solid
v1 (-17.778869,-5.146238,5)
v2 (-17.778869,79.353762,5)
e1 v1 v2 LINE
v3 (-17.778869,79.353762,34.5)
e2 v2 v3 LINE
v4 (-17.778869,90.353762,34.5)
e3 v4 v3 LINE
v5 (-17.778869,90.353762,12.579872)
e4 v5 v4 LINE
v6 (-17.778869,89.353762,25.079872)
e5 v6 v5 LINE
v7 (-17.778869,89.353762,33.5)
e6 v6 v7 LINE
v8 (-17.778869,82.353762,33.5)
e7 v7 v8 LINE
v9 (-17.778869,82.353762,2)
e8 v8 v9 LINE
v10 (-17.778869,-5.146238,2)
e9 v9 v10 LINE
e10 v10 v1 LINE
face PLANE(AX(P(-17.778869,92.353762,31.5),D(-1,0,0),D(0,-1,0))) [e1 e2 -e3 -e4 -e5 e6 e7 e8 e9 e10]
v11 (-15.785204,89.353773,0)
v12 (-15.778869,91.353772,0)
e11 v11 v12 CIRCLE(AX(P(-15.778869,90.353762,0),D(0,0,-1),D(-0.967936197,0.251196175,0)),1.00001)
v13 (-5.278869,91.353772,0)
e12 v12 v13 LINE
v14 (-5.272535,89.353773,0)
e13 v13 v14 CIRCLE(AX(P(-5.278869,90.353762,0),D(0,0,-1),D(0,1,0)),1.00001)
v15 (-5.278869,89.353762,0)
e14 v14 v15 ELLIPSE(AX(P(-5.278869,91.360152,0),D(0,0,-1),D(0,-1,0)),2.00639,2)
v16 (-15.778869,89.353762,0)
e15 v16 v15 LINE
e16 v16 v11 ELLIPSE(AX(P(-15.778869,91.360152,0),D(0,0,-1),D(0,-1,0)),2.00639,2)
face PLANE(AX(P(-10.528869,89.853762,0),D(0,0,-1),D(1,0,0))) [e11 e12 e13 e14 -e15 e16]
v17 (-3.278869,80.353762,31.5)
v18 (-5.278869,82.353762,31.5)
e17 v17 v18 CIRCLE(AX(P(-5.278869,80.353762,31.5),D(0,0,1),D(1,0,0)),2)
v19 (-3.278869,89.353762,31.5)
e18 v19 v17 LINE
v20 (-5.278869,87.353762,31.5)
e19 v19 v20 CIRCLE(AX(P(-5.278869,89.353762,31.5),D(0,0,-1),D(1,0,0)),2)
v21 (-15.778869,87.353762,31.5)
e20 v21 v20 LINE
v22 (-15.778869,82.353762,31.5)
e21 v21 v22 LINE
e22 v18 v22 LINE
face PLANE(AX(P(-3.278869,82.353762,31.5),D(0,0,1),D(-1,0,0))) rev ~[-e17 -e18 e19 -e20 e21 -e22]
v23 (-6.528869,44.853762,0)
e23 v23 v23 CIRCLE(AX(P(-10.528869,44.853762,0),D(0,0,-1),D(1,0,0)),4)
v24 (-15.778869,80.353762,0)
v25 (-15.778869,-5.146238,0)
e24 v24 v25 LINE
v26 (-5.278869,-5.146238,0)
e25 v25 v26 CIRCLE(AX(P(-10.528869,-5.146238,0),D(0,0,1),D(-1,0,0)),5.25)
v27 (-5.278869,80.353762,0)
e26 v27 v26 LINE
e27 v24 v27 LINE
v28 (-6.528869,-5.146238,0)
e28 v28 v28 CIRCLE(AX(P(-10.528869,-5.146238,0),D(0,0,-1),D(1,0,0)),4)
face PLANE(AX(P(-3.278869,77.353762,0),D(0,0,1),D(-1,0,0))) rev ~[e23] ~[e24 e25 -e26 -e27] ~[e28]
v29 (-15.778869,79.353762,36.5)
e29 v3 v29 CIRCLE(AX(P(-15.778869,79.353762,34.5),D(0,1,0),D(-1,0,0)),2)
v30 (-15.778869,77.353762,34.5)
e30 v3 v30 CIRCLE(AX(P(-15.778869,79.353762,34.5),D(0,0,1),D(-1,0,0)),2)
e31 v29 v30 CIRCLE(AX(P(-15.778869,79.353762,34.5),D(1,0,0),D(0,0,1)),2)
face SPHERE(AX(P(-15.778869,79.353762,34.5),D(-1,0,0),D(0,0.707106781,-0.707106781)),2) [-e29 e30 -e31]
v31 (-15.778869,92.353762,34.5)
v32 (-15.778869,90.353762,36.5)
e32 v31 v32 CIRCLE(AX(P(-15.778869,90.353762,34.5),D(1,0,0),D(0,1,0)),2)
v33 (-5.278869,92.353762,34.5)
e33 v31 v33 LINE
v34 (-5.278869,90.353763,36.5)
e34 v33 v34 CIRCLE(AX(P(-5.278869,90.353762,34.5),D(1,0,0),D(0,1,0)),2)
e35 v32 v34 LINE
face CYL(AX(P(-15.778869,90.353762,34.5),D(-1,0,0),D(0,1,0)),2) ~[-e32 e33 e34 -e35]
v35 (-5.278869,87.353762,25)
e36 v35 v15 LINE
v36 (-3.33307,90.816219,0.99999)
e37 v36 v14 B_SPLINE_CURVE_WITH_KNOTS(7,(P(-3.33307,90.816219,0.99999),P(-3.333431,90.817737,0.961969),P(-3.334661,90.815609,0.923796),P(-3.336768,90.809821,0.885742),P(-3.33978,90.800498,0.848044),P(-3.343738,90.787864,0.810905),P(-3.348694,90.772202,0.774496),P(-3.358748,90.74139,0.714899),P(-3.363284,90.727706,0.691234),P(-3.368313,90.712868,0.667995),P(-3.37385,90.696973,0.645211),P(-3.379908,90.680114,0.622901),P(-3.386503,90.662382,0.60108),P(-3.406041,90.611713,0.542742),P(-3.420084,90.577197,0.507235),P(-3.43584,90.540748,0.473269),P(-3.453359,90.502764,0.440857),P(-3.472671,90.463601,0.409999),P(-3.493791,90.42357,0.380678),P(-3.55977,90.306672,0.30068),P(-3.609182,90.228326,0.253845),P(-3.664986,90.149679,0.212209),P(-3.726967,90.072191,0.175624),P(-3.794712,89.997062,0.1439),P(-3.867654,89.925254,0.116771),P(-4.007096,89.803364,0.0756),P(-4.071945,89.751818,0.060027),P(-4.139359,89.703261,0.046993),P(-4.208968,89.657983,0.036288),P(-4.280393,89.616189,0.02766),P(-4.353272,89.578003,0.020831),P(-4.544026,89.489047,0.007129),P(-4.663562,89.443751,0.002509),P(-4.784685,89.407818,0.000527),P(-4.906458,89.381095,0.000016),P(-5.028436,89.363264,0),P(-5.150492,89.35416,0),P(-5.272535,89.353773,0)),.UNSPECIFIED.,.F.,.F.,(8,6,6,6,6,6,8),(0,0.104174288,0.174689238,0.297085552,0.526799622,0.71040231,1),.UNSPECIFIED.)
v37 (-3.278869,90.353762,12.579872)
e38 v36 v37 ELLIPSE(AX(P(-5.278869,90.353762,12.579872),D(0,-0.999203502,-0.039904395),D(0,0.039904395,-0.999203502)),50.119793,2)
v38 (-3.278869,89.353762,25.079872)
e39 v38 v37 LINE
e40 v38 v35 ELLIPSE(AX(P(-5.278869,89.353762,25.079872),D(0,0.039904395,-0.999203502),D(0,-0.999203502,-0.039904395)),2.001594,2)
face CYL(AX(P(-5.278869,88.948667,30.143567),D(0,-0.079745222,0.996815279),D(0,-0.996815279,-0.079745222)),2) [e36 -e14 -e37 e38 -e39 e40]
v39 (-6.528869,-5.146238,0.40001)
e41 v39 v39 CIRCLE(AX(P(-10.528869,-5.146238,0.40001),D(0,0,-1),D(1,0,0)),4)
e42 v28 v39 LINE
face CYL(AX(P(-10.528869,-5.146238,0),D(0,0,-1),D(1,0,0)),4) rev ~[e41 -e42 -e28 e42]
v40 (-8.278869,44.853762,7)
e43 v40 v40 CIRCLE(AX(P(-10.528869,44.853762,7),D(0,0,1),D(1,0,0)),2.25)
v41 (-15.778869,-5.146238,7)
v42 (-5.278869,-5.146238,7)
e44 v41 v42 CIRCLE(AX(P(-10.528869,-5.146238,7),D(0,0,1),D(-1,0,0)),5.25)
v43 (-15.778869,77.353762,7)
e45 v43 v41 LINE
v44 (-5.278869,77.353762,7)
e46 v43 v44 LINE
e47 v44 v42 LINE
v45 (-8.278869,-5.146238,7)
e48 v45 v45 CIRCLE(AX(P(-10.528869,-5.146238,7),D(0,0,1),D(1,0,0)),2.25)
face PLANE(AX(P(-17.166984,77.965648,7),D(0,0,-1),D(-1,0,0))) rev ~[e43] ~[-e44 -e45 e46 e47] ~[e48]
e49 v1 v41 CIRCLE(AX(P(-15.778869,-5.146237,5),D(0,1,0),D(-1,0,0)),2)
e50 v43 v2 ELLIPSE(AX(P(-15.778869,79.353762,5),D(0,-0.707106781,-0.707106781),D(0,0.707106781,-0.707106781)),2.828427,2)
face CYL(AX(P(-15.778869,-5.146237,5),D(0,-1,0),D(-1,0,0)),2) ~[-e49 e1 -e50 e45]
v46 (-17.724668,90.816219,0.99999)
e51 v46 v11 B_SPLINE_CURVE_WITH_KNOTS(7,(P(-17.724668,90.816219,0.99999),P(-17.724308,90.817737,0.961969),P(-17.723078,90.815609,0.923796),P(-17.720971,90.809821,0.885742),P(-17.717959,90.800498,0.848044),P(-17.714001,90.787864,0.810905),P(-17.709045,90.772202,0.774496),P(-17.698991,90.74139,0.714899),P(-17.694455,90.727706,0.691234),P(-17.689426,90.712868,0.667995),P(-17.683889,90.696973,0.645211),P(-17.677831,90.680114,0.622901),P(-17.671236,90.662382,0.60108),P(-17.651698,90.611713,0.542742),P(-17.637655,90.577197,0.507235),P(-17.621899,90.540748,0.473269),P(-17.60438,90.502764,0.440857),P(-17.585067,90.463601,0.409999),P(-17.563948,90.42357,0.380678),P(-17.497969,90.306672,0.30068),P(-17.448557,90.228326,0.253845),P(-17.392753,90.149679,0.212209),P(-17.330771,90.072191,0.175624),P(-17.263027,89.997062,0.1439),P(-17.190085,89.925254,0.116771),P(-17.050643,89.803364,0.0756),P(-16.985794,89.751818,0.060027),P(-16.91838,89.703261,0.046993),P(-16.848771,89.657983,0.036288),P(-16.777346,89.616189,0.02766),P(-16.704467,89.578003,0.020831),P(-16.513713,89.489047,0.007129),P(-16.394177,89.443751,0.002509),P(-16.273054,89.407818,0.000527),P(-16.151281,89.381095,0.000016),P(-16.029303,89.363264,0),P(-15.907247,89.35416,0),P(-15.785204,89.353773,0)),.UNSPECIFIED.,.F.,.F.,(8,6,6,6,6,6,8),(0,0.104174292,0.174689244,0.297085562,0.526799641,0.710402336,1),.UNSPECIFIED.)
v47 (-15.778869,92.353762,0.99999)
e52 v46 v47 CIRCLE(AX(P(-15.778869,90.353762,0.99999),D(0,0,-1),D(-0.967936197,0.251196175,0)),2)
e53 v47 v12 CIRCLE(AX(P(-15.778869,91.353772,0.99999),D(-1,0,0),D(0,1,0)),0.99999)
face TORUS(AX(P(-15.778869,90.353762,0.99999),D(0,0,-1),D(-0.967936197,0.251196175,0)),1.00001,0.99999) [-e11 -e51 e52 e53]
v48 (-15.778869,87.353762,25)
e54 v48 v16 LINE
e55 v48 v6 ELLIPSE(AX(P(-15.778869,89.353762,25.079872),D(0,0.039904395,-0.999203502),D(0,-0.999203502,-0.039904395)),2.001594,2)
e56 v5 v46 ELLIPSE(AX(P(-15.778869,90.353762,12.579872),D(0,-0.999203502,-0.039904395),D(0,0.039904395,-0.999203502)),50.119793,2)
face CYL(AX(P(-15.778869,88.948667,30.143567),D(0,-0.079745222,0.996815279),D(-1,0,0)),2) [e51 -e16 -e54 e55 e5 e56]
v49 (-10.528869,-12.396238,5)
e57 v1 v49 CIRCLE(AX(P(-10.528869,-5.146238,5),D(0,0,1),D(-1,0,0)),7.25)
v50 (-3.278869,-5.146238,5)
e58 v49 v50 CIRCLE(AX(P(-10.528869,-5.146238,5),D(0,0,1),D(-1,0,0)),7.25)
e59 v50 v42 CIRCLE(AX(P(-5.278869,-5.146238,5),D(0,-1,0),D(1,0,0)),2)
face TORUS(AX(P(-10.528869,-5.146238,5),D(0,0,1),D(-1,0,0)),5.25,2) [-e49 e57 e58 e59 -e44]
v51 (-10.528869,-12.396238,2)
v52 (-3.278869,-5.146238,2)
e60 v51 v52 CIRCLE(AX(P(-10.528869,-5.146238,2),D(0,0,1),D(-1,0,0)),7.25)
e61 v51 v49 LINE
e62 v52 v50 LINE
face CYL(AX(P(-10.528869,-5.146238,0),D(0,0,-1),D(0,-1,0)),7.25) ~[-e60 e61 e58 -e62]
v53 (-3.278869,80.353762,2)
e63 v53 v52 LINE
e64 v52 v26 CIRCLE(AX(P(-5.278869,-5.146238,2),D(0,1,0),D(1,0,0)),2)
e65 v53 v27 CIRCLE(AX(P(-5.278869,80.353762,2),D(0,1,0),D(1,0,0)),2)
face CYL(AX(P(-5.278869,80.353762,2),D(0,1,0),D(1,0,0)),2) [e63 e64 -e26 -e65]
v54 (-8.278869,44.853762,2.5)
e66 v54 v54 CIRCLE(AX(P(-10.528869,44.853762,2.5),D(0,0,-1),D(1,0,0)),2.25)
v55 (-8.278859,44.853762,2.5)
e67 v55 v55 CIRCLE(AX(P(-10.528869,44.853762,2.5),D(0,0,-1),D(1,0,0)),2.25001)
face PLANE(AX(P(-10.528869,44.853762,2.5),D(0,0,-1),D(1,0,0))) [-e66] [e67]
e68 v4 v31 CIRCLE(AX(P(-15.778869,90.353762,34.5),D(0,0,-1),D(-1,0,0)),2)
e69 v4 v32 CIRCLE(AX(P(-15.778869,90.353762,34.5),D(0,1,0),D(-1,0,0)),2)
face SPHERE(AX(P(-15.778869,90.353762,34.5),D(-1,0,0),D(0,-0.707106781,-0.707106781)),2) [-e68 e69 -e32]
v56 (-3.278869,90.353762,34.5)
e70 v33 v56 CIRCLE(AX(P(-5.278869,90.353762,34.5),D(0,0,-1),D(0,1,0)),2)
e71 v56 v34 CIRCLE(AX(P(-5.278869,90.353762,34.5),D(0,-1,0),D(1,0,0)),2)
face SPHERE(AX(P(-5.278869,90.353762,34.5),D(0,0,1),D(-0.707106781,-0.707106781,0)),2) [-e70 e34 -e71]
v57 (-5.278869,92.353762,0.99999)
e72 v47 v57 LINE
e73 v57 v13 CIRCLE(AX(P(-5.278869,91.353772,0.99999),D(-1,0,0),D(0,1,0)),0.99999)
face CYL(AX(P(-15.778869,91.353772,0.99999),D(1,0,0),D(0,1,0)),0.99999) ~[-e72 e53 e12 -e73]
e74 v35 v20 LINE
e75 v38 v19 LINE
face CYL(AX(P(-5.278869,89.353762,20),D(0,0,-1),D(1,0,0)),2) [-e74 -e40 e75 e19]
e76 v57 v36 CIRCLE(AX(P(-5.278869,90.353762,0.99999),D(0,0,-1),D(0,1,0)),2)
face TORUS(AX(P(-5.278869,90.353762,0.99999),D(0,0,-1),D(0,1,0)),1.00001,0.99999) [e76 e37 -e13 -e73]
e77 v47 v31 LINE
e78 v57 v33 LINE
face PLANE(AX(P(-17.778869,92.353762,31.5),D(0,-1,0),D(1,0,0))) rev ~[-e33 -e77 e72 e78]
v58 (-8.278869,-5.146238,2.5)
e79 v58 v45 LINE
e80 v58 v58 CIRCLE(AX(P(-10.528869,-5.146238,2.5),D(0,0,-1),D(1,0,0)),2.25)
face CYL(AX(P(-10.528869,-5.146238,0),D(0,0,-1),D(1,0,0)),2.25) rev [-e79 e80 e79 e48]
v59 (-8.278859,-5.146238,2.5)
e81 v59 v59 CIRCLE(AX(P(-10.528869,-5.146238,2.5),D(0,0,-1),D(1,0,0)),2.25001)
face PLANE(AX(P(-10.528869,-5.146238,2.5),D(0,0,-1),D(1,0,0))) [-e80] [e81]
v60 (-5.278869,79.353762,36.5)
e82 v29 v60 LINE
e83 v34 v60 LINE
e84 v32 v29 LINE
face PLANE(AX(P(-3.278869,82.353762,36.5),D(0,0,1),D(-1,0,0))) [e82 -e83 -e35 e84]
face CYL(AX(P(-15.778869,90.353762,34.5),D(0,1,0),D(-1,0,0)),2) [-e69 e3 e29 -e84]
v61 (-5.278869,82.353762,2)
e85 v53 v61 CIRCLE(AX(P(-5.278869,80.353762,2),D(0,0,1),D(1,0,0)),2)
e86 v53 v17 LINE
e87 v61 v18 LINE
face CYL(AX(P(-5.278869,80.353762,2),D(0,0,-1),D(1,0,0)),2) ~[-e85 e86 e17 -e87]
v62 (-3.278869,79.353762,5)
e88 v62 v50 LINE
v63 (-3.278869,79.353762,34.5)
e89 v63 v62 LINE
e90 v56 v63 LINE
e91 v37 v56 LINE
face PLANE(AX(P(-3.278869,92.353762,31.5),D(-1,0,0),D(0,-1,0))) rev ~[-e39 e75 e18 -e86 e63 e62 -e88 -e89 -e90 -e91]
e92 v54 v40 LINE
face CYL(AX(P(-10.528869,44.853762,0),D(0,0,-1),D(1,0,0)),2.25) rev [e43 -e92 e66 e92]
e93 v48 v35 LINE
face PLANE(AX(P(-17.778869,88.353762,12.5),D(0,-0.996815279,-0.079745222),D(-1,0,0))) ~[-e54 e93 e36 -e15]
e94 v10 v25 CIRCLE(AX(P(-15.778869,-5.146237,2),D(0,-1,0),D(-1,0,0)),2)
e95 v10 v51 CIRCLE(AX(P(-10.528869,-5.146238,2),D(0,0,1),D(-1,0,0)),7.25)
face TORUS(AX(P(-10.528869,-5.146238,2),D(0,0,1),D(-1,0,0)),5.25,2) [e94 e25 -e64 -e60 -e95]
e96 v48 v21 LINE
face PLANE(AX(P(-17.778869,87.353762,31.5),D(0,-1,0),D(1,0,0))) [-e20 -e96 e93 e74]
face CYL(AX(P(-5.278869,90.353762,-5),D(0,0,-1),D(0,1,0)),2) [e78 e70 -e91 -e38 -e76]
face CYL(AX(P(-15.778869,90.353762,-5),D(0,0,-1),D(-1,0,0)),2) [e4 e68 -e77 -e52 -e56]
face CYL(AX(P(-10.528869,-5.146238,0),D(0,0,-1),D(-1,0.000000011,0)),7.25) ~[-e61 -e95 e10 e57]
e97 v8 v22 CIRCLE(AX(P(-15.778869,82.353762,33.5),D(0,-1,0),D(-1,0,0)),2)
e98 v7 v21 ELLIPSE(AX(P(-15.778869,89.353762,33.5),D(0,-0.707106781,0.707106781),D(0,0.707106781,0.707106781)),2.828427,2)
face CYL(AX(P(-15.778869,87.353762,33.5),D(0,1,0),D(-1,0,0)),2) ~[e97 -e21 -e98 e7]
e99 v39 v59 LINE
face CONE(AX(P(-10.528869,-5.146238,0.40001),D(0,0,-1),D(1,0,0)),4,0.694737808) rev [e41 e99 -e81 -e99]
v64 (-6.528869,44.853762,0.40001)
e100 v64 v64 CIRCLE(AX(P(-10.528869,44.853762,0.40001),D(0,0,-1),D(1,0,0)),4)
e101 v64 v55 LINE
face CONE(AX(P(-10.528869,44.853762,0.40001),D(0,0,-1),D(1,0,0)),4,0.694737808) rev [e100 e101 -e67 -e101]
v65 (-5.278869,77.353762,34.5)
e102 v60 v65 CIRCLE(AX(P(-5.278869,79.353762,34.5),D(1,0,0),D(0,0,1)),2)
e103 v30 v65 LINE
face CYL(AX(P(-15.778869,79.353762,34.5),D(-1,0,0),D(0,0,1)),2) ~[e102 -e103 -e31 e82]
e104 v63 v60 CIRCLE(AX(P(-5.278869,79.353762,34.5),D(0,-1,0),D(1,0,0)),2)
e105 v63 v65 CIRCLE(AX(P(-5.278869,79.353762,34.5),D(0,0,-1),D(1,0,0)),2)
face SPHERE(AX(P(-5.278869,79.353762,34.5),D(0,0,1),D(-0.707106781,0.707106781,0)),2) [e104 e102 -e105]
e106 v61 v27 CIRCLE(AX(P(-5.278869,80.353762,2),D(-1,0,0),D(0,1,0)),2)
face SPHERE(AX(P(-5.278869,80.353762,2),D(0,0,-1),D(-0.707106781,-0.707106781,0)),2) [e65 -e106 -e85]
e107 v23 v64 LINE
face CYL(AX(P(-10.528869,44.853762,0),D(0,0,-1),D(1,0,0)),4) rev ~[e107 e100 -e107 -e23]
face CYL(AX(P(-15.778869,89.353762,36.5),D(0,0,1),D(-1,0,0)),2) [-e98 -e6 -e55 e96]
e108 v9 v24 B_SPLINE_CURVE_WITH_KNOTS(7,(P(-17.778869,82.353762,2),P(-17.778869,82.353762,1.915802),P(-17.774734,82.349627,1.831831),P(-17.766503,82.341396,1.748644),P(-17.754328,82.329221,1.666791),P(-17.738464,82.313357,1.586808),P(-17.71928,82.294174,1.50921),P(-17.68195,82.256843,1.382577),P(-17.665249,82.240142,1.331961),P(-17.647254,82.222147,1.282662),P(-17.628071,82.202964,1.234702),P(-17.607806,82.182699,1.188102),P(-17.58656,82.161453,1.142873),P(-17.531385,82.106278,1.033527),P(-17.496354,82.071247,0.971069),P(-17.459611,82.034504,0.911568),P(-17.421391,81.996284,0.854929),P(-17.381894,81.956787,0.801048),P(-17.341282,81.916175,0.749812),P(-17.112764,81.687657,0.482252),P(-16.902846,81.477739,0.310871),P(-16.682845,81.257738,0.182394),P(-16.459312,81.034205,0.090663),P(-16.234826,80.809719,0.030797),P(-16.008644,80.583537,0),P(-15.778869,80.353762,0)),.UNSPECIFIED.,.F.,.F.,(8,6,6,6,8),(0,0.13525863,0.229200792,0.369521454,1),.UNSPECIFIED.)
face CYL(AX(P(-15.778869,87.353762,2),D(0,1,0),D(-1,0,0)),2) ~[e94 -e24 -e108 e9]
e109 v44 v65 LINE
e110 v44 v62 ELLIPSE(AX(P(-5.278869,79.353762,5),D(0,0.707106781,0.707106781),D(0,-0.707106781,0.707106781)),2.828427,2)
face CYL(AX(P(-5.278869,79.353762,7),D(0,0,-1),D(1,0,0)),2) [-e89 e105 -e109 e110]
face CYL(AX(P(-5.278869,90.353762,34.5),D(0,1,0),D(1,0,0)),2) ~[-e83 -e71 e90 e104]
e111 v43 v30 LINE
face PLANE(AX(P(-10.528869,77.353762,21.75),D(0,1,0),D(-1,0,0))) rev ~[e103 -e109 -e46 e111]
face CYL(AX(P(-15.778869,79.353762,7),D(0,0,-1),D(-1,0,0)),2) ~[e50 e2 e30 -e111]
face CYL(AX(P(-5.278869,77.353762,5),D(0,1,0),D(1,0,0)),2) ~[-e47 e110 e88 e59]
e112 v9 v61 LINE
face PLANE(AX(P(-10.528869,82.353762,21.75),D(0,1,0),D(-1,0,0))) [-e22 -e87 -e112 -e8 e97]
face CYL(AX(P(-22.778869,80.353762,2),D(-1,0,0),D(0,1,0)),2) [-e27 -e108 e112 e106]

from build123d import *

# Parameters (mm, degrees)
F2_R          = 2.25
F7_DEPTH      = 7
F10_R         = 4
F10_R_2       = 2.25
F11_DEPTH     = 2.5
F12_SIZE2     = 1.74999
F12_SIZE      = 2.09999
F12_2_SIZE2   = 1.74999
F12_2_SIZE    = 2.09999
F14_W         = 14.5
F14_H         = 25.25
F15_DEPTH     = 7
F16_W         = 14.5
F16_H         = 29.5
F16_H_2       = 7
F17_DEPTH     = 5
F18_W         = 14.5
F18_H         = 5
F19_DEPTH     = 10
F20_W         = 14.5
F20_H         = 5
F21_DEPTH     = 31.5
F22_SIZE2     = 2
F22_SIZE      = 25
F23_T1_DEPTH  = 11
F23_T3_DEPTH  = 27.5
F23_T5_DEPTH  = 29.5
F23_T7_DEPTH  = 11.5
F23_T9_DEPTH  = 39.5
F23_T11_DEPTH = 35.079872408
F23_T13_DEPTH = 82.5
F23_T15_DEPTH = 85.5
F23_T17_DEPTH = 5
F23_T19_DEPTH = 10.5
F23_T21_DEPTH = 17.5
F23_T23_DEPTH = 92.4999999229
F23_T25_DEPTH = 82.4999999229
F23_S29_W     = 2
F23_S29_H     = 2
F23_T30_DEPTH = 2
F23_S35_W     = 2
F23_S35_H     = 2
F23_T36_DEPTH = 2
F23_S41_W     = 2
F23_S41_H     = 2
F23_T42_DEPTH = 2
F23_S47_W     = 2
F23_S47_H     = 2
F23_T48_DEPTH = 2
F23_S53_W     = 2
F23_S53_H     = 2
F23_T54_DEPTH = 2
F23_T58_ANGLE = 180.0000006096
F23_T60_ANGLE = 180.0000006096
F23_T65_DEPTH = 32.5
F23_T69_DEPTH = 87.5
F23_T76_DEPTH = 32.5
F23_T80_DEPTH = 87.4999999229
F23_T87_DEPTH = 16.5
F23_T91_DEPTH = 10
F24_R         = 0.99999


# Not quite as in the source:
# - a fillet or chamfer that OpenCascade refuses, or shapes differently, is made with other operations: its cross-section is extruded or revolved along the edge and cut away or added
# - a fillet or chamfer is up to 0.001 mm smaller than in the source, because OpenCascade refuses the exact size


with BuildPart() as f7:
    # F2 (on Top) → F7 (new body)
    with BuildSketch(Plane.XY):
        with BuildLine():
            Line((-3.2788694371, 52.1037624441), (-17.7788694371, 52.1037624441))
            Line((-17.7788694371, 52.1037624441), (-17.7788694371, -5.1462374788))
            ThreePointArc((-17.7788694371, -5.1462374788), (-10.5288693985, 2.1037624441), (-3.2788694371, -5.1462375559))
            Line((-3.2788694371, -5.1462375559), (-3.2788694371, 52.1037624441))
        make_face()
        with Locations((-10.5288694371, 44.8537624441)):
            Circle(F2_R, mode=Mode.SUBTRACT)
        with BuildLine():
            ThreePointArc((-3.2788694371, -5.1462375559), (-10.5288693985, 2.1037624441), (-17.7788694371, -5.1462374788))
            ThreePointArc((-17.7788694371, -5.1462374788), (-15.6553936279, -10.2727616922), (-10.5288694371, -12.3962375559))
            ThreePointArc((-10.5288694371, -12.3962375559), (-5.4023452735, -10.2727617195), (-3.2788694371, -5.1462375559))
        make_face()
        with Locations((-10.5288694371, -5.1462375559)):
            Circle(F2_R, mode=Mode.SUBTRACT)
    extrude(amount=F7_DEPTH)

    # F10 (on face) → F11 (cut)
    with BuildSketch(Plane(origin=(0, 0, 0), x_dir=(1, 0, 0), z_dir=(0, 0, -1))):
        with Locations((-10.5288694371, 5.1462375559)):
            Circle(F10_R)
        with Locations((-10.5288694371, 5.1462375559)):
            Circle(F10_R_2, mode=Mode.SUBTRACT)
        with Locations((-10.5288694371, -44.8537624441)):
            Circle(F10_R)
        with Locations((-10.5288694371, -44.8537624441)):
            Circle(F10_R_2, mode=Mode.SUBTRACT)
    extrude(amount=-F11_DEPTH, mode=Mode.SUBTRACT)

    # F12 (size 2.1 and 1.75 in the source; OpenCascade refuses exactly that, so slightly less here)
    f12_edges = [f7.edges().sort_by_distance(p)[0] for p in [
        (-14.528869, -5.146238, 2.5),
    ]]
    f12_side = f7.faces().sort_by_distance((-14.528869, -5.146238, 1.25))[0]
    chamfer(f12_edges, length=F12_SIZE, length2=F12_SIZE2, reference=f12_side)

    # F12#2 (size 2.1 and 1.75 in the source; OpenCascade refuses exactly that, so slightly less here)
    f12_2_edges = [f7.edges().sort_by_distance(p)[0] for p in [
        (-14.528869, 44.853762, 2.5),
    ]]
    f12_2_side = f7.faces().sort_by_distance((-14.528869, 44.853762, 1.25))[0]
    chamfer(f12_2_edges, length=F12_2_SIZE, length2=F12_2_SIZE2, reference=f12_2_side)

    # F14 (on face) → F15 (join)
    with BuildSketch(Plane.XY.offset(7)):
        with Locations((-10.5288694371, 64.7287624441)):
            Rectangle(F14_W, F14_H)
    extrude(amount=-F15_DEPTH)

    # F16 (on face) → F17 (join)
    with BuildSketch(Plane(origin=(0, 77.3537624441, 0), x_dir=(-1, 0, 0), z_dir=(0, 1, 0))):
        with Locations((10.5288694371, 21.75)):
            Rectangle(F16_W, F16_H)
        with Locations((10.5288694371, 3.5)):
            Rectangle(F16_W, F16_H_2)
    extrude(amount=F17_DEPTH)

    # F18 (on face) → F19 (join)
    with BuildSketch(Plane(origin=(0, 82.3537624441, 0), x_dir=(-1, 0, 0), z_dir=(0, 1, 0))):
        with Locations((10.5288694371, 34)):
            Rectangle(F18_W, F18_H)
    extrude(amount=F19_DEPTH)

    # F20 (on face) → F21 (join)
    with BuildSketch(Plane(origin=(0, 0, 31.5), x_dir=(1, 0, 0), z_dir=(0, 0, -1))):
        with Locations((-10.5288694371, -89.8537624441)):
            Rectangle(F20_W, F20_H)
    extrude(amount=F21_DEPTH)

    # F22
    f22_edges = [f7.edges().sort_by_distance(p)[0] for p in [
        (-10.528869, 87.353762, 0),
    ]]
    f22_side = f7.faces().sort_by_distance((-10.528869, 87.353762, 15.75))[0]
    chamfer(f22_edges, length=F22_SIZE, length2=F22_SIZE2, reference=f22_side)

    # F23: fillet of radius 2 on 17 edges, made by hand

    # F23_s2 → F23_t1 (cut)
    with BuildSketch(Plane.XZ.offset(-90.3537624441)):
        with BuildLine():
            ThreePointArc((-3.2788694371, 34.5), (-3.8646558747, 35.9142135624), (-5.2788694371, 36.5))
            Line((-5.2788694371, 36.5), (-3.2788694371, 36.5))
            Line((-3.2788694371, 36.5), (-3.2788694371, 34.5))
        make_face()
        with BuildLine():
            ThreePointArc((-17.7788694371, 34.5), (-17.1930829994, 35.9142135624), (-15.7788694371, 36.5))
            Line((-15.7788694371, 36.5), (-17.7788694371, 36.5))
            Line((-17.7788694371, 36.5), (-17.7788694371, 34.5))
        make_face()
    extrude(amount=F23_T1_DEPTH, mode=Mode.SUBTRACT)

    # F23_s4 → F23_t3 (cut)
    with BuildSketch(Plane.XY.offset(7)):
        with BuildLine():
            ThreePointArc((-3.2788694371, 79.3537624441), (-3.8646558747, 77.9395488817), (-5.2788694371, 77.3537624441))
            Line((-5.2788694371, 77.3537624441), (-3.2788694371, 77.3537624441))
            Line((-3.2788694371, 77.3537624441), (-3.2788694371, 79.3537624441))
        make_face()
        with BuildLine():
            ThreePointArc((-17.7788694371, 79.3537624441), (-17.1930829994, 77.9395488817), (-15.7788694371, 77.3537624441))
            Line((-15.7788694371, 77.3537624441), (-17.7788694371, 77.3537624441))
            Line((-17.7788694371, 77.3537624441), (-17.7788694371, 79.3537624441))
        make_face()
    extrude(amount=F23_T3_DEPTH, mode=Mode.SUBTRACT)

    # F23_s6 → F23_t5 (cut)
    with BuildSketch(Plane.XY.offset(2)):
        with BuildLine():
            ThreePointArc((-3.2788694371, 80.3537624441), (-3.8646558747, 81.7679760065), (-5.2788694371, 82.3537624441))
            Line((-5.2788694371, 82.3537624441), (-3.2788694371, 82.3537624441))
            Line((-3.2788694371, 82.3537624441), (-3.2788694371, 80.3537624441))
        make_face()
    extrude(amount=F23_T5_DEPTH, mode=Mode.SUBTRACT)

    # F23_s8 → F23_t7 (cut)
    with BuildSketch(Plane.XY.offset(20)):
        with BuildLine():
            ThreePointArc((-3.2788694371, 89.3537624441), (-3.8646558747, 87.9395488817), (-5.2788694371, 87.3537624441))
            Line((-5.2788694371, 87.3537624441), (-3.2788694371, 87.3537624441))
            Line((-3.2788694371, 87.3537624441), (-3.2788694371, 89.3537624441))
        make_face()
        with BuildLine():
            ThreePointArc((-17.7788694371, 89.3537624441), (-17.1930829994, 87.9395488817), (-15.7788694371, 87.3537624441))
            Line((-15.7788694371, 87.3537624441), (-17.7788694371, 87.3537624441))
            Line((-17.7788694371, 87.3537624441), (-17.7788694371, 89.3537624441))
        make_face()
    extrude(amount=F23_T7_DEPTH, mode=Mode.SUBTRACT)

    # F23_s10 → F23_t9 (cut)
    with BuildSketch(Plane.XY.offset(-5)):
        with BuildLine():
            ThreePointArc((-5.2788694371, 92.3537624441), (-3.8646558747, 91.7679760065), (-3.2788694371, 90.3537624441))
            Line((-3.2788694371, 90.3537624441), (-3.2788694371, 92.3537624441))
            Line((-3.2788694371, 92.3537624441), (-5.2788694371, 92.3537624441))
        make_face()
        with BuildLine():
            ThreePointArc((-17.7788694371, 90.3537624441), (-17.1930829994, 91.7679760065), (-15.7788694371, 92.3537624441))
            Line((-15.7788694371, 92.3537624441), (-17.7788694371, 92.3537624441))
            Line((-17.7788694371, 92.3537624441), (-17.7788694371, 90.3537624441))
        make_face()
    extrude(amount=F23_T9_DEPTH, mode=Mode.SUBTRACT)

    # F23_s12 → F23_t11 (cut)
    with BuildSketch(Plane(origin=(0, -1.8304986873, 22.8812335911), x_dir=(1, 0, 0), z_dir=(0, 0.0797452223, -0.9968152785))):
        with BuildLine():
            ThreePointArc((-5.2788694371, -89.069195599), (-3.8646558747, -89.6549820366), (-3.2788694371, -91.069195599))
            Line((-3.2788694371, -91.069195599), (-3.2788694371, -89.069195599))
            Line((-3.2788694371, -89.069195599), (-5.2788694371, -89.069195599))
        make_face()
        with BuildLine():
            ThreePointArc((-17.7788694371, -91.069195599), (-17.1930829994, -89.6549820366), (-15.7788694371, -89.069195599))
            Line((-15.7788694371, -89.069195599), (-17.7788694371, -89.069195599))
            Line((-17.7788694371, -89.069195599), (-17.7788694371, -91.069195599))
        make_face()
    extrude(amount=F23_T11_DEPTH, mode=Mode.SUBTRACT)

    # F23_s14 → F23_t13 (cut)
    with BuildSketch(Plane.XZ.offset(-77.3537624441)):
        with BuildLine():
            ThreePointArc((-3.2788694371, 5), (-3.8646558747, 6.4142135624), (-5.2788694371, 7))
            Line((-5.2788694371, 7), (-3.2788694371, 7))
            Line((-3.2788694371, 7), (-3.2788694371, 5))
        make_face()
    extrude(amount=F23_T13_DEPTH, mode=Mode.SUBTRACT)

    # F23_s16 → F23_t15 (cut)
    with BuildSketch(Plane.XZ.offset(-80.3537624441)):
        with BuildLine():
            ThreePointArc((-3.2788694371, 2), (-3.8646558747, 0.5857864376), (-5.2788694371, 0))
            Line((-5.2788694371, 0), (-3.2788694371, 0))
            Line((-3.2788694371, 0), (-3.2788694371, 2))
        make_face()
    extrude(amount=F23_T15_DEPTH, mode=Mode.SUBTRACT)

    # F23_s18 → F23_t17 (cut)
    with BuildSketch(Plane.XZ.offset(-87.3537624441)):
        with BuildLine():
            ThreePointArc((-17.7788694371, 33.5), (-17.1930829994, 32.0857864376), (-15.7788694371, 31.5))
            Line((-15.7788694371, 31.5), (-17.7788694371, 31.5))
            Line((-17.7788694371, 31.5), (-17.7788694371, 33.5))
        make_face()
    extrude(amount=F23_T17_DEPTH, mode=Mode.SUBTRACT)

    # F23_s20 → F23_t19 (cut)
    with BuildSketch(Plane.YZ.offset(-15.7788694371)):
        with BuildLine():
            ThreePointArc((79.3537624441, 36.5), (77.9395488817, 35.9142135624), (77.3537624441, 34.5))
            Line((77.3537624441, 34.5), (77.3537624441, 36.5))
            Line((77.3537624441, 36.5), (79.3537624441, 36.5))
        make_face()
        with BuildLine():
            ThreePointArc((92.3537624441, 34.5), (91.7679760065, 35.9142135624), (90.3537624441, 36.5))
            Line((90.3537624441, 36.5), (92.3537624441, 36.5))
            Line((92.3537624441, 36.5), (92.3537624441, 34.5))
        make_face()
    extrude(amount=F23_T19_DEPTH, mode=Mode.SUBTRACT)

    # F23_s22 → F23_t21 (cut)
    with BuildSketch(Plane.YZ.offset(-22.7788694371)):
        with BuildLine():
            ThreePointArc((82.3537624441, 2), (81.7679760065, 0.5857864376), (80.3537624441, 0))
            Line((80.3537624441, 0), (82.3537624441, 0))
            Line((82.3537624441, 0), (82.3537624441, 2))
        make_face()
    extrude(amount=F23_T21_DEPTH, mode=Mode.SUBTRACT)

    # F23_s24 → F23_t23 (cut)
    with BuildSketch(Plane.XZ.offset(-87.3537624441)):
        with BuildLine():
            ThreePointArc((-17.7788694371, 2), (-17.1930829994, 0.5857864376), (-15.7788694371, 0))
            Line((-15.7788694371, 0), (-17.7788694371, 0))
            Line((-17.7788694371, 0), (-17.7788694371, 2))
        make_face()
    extrude(amount=F23_T23_DEPTH, mode=Mode.SUBTRACT)

    # F23_s26 → F23_t25 (cut)
    with BuildSketch(Plane.XZ.offset(-77.3537624441)):
        with BuildLine():
            ThreePointArc((-17.7788694371, 5), (-17.1930829994, 6.4142135624), (-15.7788694371, 7))
            Line((-15.7788694371, 7), (-17.7788694371, 7))
            Line((-17.7788694371, 7), (-17.7788694371, 5))
        make_face()
    extrude(amount=F23_T25_DEPTH, mode=Mode.SUBTRACT)


with BuildPart() as f23_tool28:
    # F23_s29 → F23_t30 (new body)
    with BuildSketch(Plane.XY.offset(34.5)):
        with Locations((-4.2788694371, 91.3537624441)):
            Rectangle(F23_S29_W, F23_S29_H)
    extrude(amount=F23_T30_DEPTH)

    # F23_s31 → F23_t32 (revolve, cut)
    with BuildSketch(Plane(origin=(-5.2788694371, 90.3537624441, 34.5), x_dir=(-0.7071067812, -0.7071067812, 0), z_dir=(-0.7071067812, 0.7071067812, 0))):
        with BuildLine():
            ThreePointArc((0, -2), (2, 0), (0, 2))
            Line((0, 2), (0, -2))
        make_face()
    revolve(axis=Axis((-5.2788694371, 90.3537624441, 34.5), (0, 0, 1)), mode=Mode.SUBTRACT)


with BuildPart() as f7_1:
    add(f7.part)

    # F23_t27: cut F23_tool28
    add(f23_tool28.part, mode=Mode.SUBTRACT)


with BuildPart() as f23_tool34:
    # F23_s35 → F23_t36 (new body)
    with BuildSketch(Plane.XY.offset(34.5)):
        with Locations((-4.2788694371, 78.3537624441)):
            Rectangle(F23_S35_W, F23_S35_H)
    extrude(amount=F23_T36_DEPTH)

    # F23_s37 → F23_t38 (revolve, cut)
    with BuildSketch(Plane(origin=(-5.2788694371, 79.3537624441, 34.5), x_dir=(-0.7071067812, 0.7071067812, 0), z_dir=(0.7071067812, 0.7071067812, 0))):
        with BuildLine():
            ThreePointArc((0, -2), (2, 0), (0, 2))
            Line((0, 2), (0, -2))
        make_face()
    revolve(axis=Axis((-5.2788694371, 79.3537624441, 34.5), (0, 0, 1)), mode=Mode.SUBTRACT)


with BuildPart() as f7_2:
    add(f7_1.part)

    # F23_t33: cut F23_tool34
    add(f23_tool34.part, mode=Mode.SUBTRACT)


with BuildPart() as f23_tool40:
    # F23_s41 → F23_t42 (new body)
    with BuildSketch(Plane.XY.offset(2)):
        with Locations((-4.2788694371, 81.3537624441)):
            Rectangle(F23_S41_W, F23_S41_H)
    extrude(amount=-F23_T42_DEPTH)

    # F23_s43 → F23_t44 (revolve, cut)
    with BuildSketch(Plane(origin=(-5.2788694371, 80.3537624441, 2), x_dir=(-0.7071067812, -0.7071067812, 0), z_dir=(0.7071067812, -0.7071067812, 0))):
        with BuildLine():
            ThreePointArc((0, -2), (2, 0), (0, 2))
            Line((0, 2), (0, -2))
        make_face()
    revolve(axis=Axis((-5.2788694371, 80.3537624441, 2), (0, 0, -1)), mode=Mode.SUBTRACT)


with BuildPart() as f7_3:
    add(f7_2.part)

    # F23_t39: cut F23_tool40
    add(f23_tool40.part, mode=Mode.SUBTRACT)


with BuildPart() as f23_tool46:
    # F23_s47 → F23_t48 (new body)
    with BuildSketch(Plane.YZ.offset(-15.7788694371)):
        with Locations((78.3537624441, 35.5)):
            Rectangle(F23_S47_W, F23_S47_H)
    extrude(amount=-F23_T48_DEPTH)

    # F23_s49 → F23_t50 (revolve, cut)
    with BuildSketch(Plane(origin=(-15.7788694371, 79.3537624441, 34.5), x_dir=(0, 0.7071067812, -0.7071067812), z_dir=(0, 0.7071067812, 0.7071067812))):
        with BuildLine():
            ThreePointArc((0, -2), (2, 0), (0, 2))
            Line((0, 2), (0, -2))
        make_face()
    revolve(axis=Axis((-15.7788694371, 79.3537624441, 34.5), (-1, 0, 0)), mode=Mode.SUBTRACT)


with BuildPart() as f7_4:
    add(f7_3.part)

    # F23_t45: cut F23_tool46
    add(f23_tool46.part, mode=Mode.SUBTRACT)


with BuildPart() as f23_tool52:
    # F23_s53 → F23_t54 (new body)
    with BuildSketch(Plane.YZ.offset(-15.7788694371)):
        with Locations((91.3537624441, 35.5)):
            Rectangle(F23_S53_W, F23_S53_H)
    extrude(amount=-F23_T54_DEPTH)

    # F23_s55 → F23_t56 (revolve, cut)
    with BuildSketch(Plane(origin=(-15.7788694371, 90.3537624441, 34.5), x_dir=(0, -0.7071067812, -0.7071067812), z_dir=(0, 0.7071067812, -0.7071067812))):
        with BuildLine():
            ThreePointArc((0, -2), (2, 0), (0, 2))
            Line((0, 2), (0, -2))
        make_face()
    revolve(axis=Axis((-15.7788694371, 90.3537624441, 34.5), (-1, 0, 0)), mode=Mode.SUBTRACT)


with BuildPart() as f7_5:
    add(f7_4.part)

    # F23_t51: cut F23_tool52
    add(f23_tool52.part, mode=Mode.SUBTRACT)

    # F23_s57 → F23_t58 (revolve, cut)
    with BuildSketch(Plane.XZ.offset(5.1462375559)):
        with BuildLine():
            ThreePointArc((-15.7788694371, 0), (-17.1930829994, 0.5857864376), (-17.7788694371, 2))
            Line((-17.7788694371, 2), (-17.7788694371, 0))
            Line((-17.7788694371, 0), (-15.7788694371, 0))
        make_face()
    revolve(axis=Axis((-10.5288694371, -5.1462375559, 0), (0, 0, 1)), revolution_arc=F23_T58_ANGLE, mode=Mode.SUBTRACT)

    # F23_s59 → F23_t60 (revolve, cut)
    with BuildSketch(Plane.XZ.offset(5.1462375559)):
        with BuildLine():
            ThreePointArc((-17.7788694371, 5), (-17.1930829994, 6.4142135624), (-15.7788694371, 7))
            Line((-15.7788694371, 7), (-17.7788694371, 7))
            Line((-17.7788694371, 7), (-17.7788694371, 5))
        make_face()
    revolve(axis=Axis((-10.5288694371, -5.1462375559, 7), (0, 0, 1)), revolution_arc=F23_T60_ANGLE, mode=Mode.SUBTRACT)


with BuildPart() as f23_tool63:
    # F23_s64 → F23_t65 (new body)
    with BuildSketch(Plane.XY.offset(34.5)):
        with BuildLine():
            ThreePointArc((-3.2788694371, 79.3537624441), (-3.8646558747, 77.9395488817), (-5.2788694371, 77.3537624441))
            Line((-5.2788694371, 77.3537624441), (-3.2788694371, 77.3537624441))
            Line((-3.2788694371, 77.3537624441), (-3.2788694371, 79.3537624441))
        make_face()
    extrude(amount=-F23_T65_DEPTH)

    split(bisect_by=Plane.XY.offset(7), keep=Keep.BOTTOM)


with BuildPart() as f23_tool67:
    # F23_s68 → F23_t69 (new body)
    with BuildSketch(Plane.XZ.offset(-82.3537624441)):
        with BuildLine():
            ThreePointArc((-3.2788694371, 5), (-3.8646558747, 6.4142135624), (-5.2788694371, 7))
            Line((-5.2788694371, 7), (-3.2788694371, 7))
            Line((-3.2788694371, 7), (-3.2788694371, 5))
        make_face()
    extrude(amount=F23_T69_DEPTH)

    split(bisect_by=Plane.XZ.offset(-77.3537624441), keep=Keep.BOTTOM)


with BuildPart() as f23_tool63_1:
    add(f23_tool63.part)

    # F23_t71: intersect F23_tool67
    add(f23_tool67.part, mode=Mode.INTERSECT)


with BuildPart() as f7_6:
    add(f7_5.part)

    # F23_t61: cut F23_tool63
    add(f23_tool63_1.part, mode=Mode.SUBTRACT)


with BuildPart() as f23_tool74:
    # F23_s75 → F23_t76 (new body)
    with BuildSketch(Plane.XY.offset(2)):
        with BuildLine():
            ThreePointArc((-17.7788694371, 79.3537624441), (-17.1930829994, 77.9395488817), (-15.7788694371, 77.3537624441))
            Line((-15.7788694371, 77.3537624441), (-17.7788694371, 77.3537624441))
            Line((-17.7788694371, 77.3537624441), (-17.7788694371, 79.3537624441))
        make_face()
    extrude(amount=F23_T76_DEPTH)

    split(bisect_by=Plane.XY.offset(7), keep=Keep.BOTTOM)


with BuildPart() as f23_tool78:
    # F23_s79 → F23_t80 (new body)
    with BuildSketch(Plane.XZ.offset(5.1462374788)):
        with BuildLine():
            ThreePointArc((-17.7788694371, 5), (-17.1930829994, 6.4142135624), (-15.7788694371, 7))
            Line((-15.7788694371, 7), (-17.7788694371, 7))
            Line((-17.7788694371, 7), (-17.7788694371, 5))
        make_face()
    extrude(amount=-F23_T80_DEPTH)

    split(bisect_by=Plane.XZ.offset(-77.3537624441), keep=Keep.BOTTOM)


with BuildPart() as f23_tool74_1:
    add(f23_tool74.part)

    # F23_t82: intersect F23_tool78
    add(f23_tool78.part, mode=Mode.INTERSECT)


with BuildPart() as f7_7:
    add(f7_6.part)

    # F23_t72: cut F23_tool74
    add(f23_tool74_1.part, mode=Mode.SUBTRACT)


with BuildPart() as f23_tool85:
    # F23_s86 → F23_t87 (new body)
    with BuildSketch(Plane.XY.offset(36.5)):
        with BuildLine():
            ThreePointArc((-17.7788694371, 89.3537624441), (-17.1930829994, 87.9395488817), (-15.7788694371, 87.3537624441))
            Line((-15.7788694371, 87.3537624441), (-17.7788694371, 87.3537624441))
            Line((-17.7788694371, 87.3537624441), (-17.7788694371, 89.3537624441))
        make_face()
    extrude(amount=-F23_T87_DEPTH)

    split(bisect_by=Plane.XY.offset(31.5), keep=Keep.TOP)


with BuildPart() as f23_tool89:
    # F23_s90 → F23_t91 (new body)
    with BuildSketch(Plane.XZ.offset(-82.3537624441)):
        with BuildLine():
            ThreePointArc((-17.7788694371, 33.5), (-17.1930829994, 32.0857864376), (-15.7788694371, 31.5))
            Line((-15.7788694371, 31.5), (-17.7788694371, 31.5))
            Line((-17.7788694371, 31.5), (-17.7788694371, 33.5))
        make_face()
    extrude(amount=-F23_T91_DEPTH)

    split(bisect_by=Plane.XZ.offset(-87.3537624441), keep=Keep.BOTTOM)


with BuildPart() as f23_tool85_1:
    add(f23_tool85.part)

    # F23_t93: intersect F23_tool89
    add(f23_tool89.part, mode=Mode.INTERSECT)


with BuildPart() as f7_8:
    add(f7_7.part)

    # F23_t83: cut F23_tool85
    add(f23_tool85_1.part, mode=Mode.SUBTRACT)

    # F24 (radius 1 in the source; OpenCascade refuses exactly that, so slightly less here)
    f24_edges = [f7_8.edges().sort_by_distance(p)[0] for p in [
        (-10.528869, 92.353762, 0),
    ]]
    fillet(f24_edges, radius=F24_R)


solid = f7_8.part
